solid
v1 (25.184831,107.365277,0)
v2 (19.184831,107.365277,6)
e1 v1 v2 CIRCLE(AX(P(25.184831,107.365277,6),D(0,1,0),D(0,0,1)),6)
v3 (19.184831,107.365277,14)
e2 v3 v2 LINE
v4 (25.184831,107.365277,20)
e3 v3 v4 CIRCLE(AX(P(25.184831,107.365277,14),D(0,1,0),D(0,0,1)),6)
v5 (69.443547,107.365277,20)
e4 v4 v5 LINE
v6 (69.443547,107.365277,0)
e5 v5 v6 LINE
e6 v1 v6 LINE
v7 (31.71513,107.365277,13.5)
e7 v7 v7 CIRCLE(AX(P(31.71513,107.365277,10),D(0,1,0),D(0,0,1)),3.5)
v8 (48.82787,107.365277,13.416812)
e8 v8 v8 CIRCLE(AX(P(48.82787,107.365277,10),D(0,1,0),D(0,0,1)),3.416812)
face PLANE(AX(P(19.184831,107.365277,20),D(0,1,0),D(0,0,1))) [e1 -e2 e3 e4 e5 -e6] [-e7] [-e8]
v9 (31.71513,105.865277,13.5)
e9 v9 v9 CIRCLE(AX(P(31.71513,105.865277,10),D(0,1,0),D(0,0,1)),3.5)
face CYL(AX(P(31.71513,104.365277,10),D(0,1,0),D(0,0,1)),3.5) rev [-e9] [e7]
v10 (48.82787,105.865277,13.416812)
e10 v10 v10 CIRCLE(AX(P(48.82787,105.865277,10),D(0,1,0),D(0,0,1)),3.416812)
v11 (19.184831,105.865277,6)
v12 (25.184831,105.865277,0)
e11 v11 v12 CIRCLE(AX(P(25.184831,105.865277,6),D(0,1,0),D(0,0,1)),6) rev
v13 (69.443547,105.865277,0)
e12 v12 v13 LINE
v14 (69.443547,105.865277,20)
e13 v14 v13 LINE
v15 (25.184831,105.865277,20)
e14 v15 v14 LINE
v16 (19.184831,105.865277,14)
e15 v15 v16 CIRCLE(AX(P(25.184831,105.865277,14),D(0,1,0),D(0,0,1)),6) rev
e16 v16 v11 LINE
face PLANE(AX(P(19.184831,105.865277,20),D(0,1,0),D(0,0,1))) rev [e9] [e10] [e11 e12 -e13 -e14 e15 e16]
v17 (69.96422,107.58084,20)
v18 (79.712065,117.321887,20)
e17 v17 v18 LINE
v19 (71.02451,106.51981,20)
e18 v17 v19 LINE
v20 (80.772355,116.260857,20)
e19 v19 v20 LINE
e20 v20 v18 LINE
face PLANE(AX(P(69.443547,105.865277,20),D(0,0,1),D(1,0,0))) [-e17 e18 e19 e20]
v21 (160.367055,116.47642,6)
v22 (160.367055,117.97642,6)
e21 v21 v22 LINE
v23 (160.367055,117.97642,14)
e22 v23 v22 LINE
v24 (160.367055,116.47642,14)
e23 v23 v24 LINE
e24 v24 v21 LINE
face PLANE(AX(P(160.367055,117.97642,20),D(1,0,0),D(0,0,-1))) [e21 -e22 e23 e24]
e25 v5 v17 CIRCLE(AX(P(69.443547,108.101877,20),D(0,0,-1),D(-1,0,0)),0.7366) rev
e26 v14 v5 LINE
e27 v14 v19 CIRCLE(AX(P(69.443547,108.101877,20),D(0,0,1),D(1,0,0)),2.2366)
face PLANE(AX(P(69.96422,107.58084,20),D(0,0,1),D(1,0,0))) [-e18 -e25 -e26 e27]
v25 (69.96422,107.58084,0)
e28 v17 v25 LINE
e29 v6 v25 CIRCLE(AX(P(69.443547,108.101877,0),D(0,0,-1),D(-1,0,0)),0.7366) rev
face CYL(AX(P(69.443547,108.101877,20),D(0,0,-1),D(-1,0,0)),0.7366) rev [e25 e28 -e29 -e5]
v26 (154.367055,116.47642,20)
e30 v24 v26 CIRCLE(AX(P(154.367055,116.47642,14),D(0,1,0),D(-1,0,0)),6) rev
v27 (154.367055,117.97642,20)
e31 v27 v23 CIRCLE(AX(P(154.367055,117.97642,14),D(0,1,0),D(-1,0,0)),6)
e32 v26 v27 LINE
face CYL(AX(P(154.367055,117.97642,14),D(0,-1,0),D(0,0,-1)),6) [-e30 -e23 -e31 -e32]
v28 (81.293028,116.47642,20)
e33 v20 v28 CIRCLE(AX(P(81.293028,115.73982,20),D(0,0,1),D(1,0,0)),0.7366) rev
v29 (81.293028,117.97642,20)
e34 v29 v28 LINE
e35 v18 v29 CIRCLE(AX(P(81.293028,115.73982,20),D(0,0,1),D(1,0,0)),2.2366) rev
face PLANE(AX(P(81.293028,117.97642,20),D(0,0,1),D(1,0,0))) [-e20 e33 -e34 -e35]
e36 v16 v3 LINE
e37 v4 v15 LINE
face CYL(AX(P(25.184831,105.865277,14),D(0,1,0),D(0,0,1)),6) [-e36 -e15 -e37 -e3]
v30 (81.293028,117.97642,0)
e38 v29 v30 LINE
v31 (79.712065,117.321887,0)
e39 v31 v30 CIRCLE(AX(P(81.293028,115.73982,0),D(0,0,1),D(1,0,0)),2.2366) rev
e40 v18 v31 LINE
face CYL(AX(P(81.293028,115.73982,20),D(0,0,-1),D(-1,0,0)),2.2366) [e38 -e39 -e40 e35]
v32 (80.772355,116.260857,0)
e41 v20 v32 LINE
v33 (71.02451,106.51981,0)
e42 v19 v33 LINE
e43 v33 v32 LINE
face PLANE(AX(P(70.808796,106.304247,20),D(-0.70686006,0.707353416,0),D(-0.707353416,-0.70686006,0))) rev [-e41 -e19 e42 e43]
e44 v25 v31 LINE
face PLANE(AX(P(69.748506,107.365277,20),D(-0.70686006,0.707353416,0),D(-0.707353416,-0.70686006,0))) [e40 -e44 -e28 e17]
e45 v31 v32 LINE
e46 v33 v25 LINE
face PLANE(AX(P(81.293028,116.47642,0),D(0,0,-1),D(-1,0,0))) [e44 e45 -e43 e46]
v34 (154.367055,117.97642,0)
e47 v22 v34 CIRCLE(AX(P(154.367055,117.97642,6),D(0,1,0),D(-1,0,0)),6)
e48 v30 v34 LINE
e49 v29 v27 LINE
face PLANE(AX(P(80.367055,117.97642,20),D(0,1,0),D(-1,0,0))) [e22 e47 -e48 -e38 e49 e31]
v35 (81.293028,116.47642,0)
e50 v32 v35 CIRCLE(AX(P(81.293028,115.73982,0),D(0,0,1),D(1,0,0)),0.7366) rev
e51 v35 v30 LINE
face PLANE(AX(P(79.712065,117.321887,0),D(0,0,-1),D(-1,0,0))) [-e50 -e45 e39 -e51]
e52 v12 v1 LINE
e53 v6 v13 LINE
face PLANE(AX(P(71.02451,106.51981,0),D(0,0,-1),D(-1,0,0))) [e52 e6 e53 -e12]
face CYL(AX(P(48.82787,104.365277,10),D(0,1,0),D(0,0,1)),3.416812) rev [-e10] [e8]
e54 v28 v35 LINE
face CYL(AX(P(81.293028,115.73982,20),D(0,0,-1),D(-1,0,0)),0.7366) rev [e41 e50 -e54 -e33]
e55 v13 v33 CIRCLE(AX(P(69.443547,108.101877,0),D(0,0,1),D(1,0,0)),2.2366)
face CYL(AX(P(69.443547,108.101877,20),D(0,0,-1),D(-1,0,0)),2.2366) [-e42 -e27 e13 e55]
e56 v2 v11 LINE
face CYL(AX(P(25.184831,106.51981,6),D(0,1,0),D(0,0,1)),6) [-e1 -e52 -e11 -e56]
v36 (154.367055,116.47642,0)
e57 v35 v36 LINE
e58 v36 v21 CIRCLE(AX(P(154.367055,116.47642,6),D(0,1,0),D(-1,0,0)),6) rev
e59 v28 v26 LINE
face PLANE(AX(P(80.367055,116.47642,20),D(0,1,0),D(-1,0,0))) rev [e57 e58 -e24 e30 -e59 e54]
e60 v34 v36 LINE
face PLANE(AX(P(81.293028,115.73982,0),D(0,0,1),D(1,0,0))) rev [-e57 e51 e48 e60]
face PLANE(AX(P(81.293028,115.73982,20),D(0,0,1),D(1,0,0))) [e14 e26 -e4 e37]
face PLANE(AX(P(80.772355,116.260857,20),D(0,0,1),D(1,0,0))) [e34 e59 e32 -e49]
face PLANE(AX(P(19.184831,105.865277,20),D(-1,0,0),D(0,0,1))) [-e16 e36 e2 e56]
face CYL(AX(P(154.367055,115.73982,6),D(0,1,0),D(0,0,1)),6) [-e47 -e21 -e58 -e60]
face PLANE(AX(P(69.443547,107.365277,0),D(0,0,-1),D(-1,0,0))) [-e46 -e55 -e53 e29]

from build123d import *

# Parameters (mm, degrees)
BASE_FLANGE1_DEPTH = 20
SKETCH2_R          = 3.5
CUT_EXTRUDE1_DEPTH = 3
SKETCH3_R          = 3.41681183
CUT_EXTRUDE2_DEPTH = 3
FILLET1_R          = 6


# Sheet-metal steps are written as plain solids
with BuildPart() as part:
    # Sketch1 → Base-Flange1 (new body)
    with BuildSketch(Plane.XY):
        with BuildLine():
            Line((19.18483114, 107.365276831), (69.443546787, 107.365276831))
            ThreePointArc((69.443546787, 107.365276831), (69.725312696, 107.421298009), (69.964219908, 107.580840304))
            Line((69.964219908, 107.580840304), (79.71206519, 117.321886786))
            ThreePointArc((79.71206519, 117.321886786), (80.437479078, 117.806318361), (81.293028401, 117.976420136))
            Line((81.293028401, 117.976420136), (160.367055374, 117.976420136))
            Line((160.367055374, 117.976420136), (160.367055374, 116.476420136))
            Line((160.367055374, 116.476420136), (81.293028401, 116.476420136))
            ThreePointArc((81.293028401, 116.476420136), (81.011262492, 116.420398957), (80.772355281, 116.260856662))
            Line((80.772355281, 116.260856662), (71.024509998, 106.51981018))
            ThreePointArc((71.024509998, 106.51981018), (70.299096111, 106.035378605), (69.443546787, 105.865276831))
            Line((69.443546787, 105.865276831), (19.18483114, 105.865276831))
            Line((19.18483114, 105.865276831), (19.18483114, 107.365276831))
        make_face()
    extrude(amount=BASE_FLANGE1_DEPTH)

    # Sketch2 → Cut-Extrude1 (cut)
    with BuildSketch(Plane(origin=(0, 107.365276831, 0), x_dir=(1, 0, 0), z_dir=(0, 1, 0))):
        with Locations(Location((31.715129554, -10, 0), (0, 0, 270))):
            Circle(SKETCH2_R)
    extrude(amount=-CUT_EXTRUDE1_DEPTH, mode=Mode.SUBTRACT)

    # Sketch3 → Cut-Extrude2 (cut)
    with BuildSketch(Plane(origin=(0, 107.365276831, 0), x_dir=(1, 0, 0), z_dir=(0, 1, 0))):
        with Locations(Location((48.827870371, -10, 0), (0, 0, 270))):
            Circle(SKETCH3_R)
    extrude(amount=-CUT_EXTRUDE2_DEPTH, mode=Mode.SUBTRACT)

    # Fillet1
    fillet1_edges = [part.edges().sort_by_distance(p)[0] for p in [
        (19.18483114, 106.615276831, 0),
        (160.367055374, 117.226420136, 0),
        (19.18483114, 106.615276831, 20),
        (160.367055374, 117.226420136, 20),
    ]]
    fillet(fillet1_edges, radius=FILLET1_R)


solid = part.part
